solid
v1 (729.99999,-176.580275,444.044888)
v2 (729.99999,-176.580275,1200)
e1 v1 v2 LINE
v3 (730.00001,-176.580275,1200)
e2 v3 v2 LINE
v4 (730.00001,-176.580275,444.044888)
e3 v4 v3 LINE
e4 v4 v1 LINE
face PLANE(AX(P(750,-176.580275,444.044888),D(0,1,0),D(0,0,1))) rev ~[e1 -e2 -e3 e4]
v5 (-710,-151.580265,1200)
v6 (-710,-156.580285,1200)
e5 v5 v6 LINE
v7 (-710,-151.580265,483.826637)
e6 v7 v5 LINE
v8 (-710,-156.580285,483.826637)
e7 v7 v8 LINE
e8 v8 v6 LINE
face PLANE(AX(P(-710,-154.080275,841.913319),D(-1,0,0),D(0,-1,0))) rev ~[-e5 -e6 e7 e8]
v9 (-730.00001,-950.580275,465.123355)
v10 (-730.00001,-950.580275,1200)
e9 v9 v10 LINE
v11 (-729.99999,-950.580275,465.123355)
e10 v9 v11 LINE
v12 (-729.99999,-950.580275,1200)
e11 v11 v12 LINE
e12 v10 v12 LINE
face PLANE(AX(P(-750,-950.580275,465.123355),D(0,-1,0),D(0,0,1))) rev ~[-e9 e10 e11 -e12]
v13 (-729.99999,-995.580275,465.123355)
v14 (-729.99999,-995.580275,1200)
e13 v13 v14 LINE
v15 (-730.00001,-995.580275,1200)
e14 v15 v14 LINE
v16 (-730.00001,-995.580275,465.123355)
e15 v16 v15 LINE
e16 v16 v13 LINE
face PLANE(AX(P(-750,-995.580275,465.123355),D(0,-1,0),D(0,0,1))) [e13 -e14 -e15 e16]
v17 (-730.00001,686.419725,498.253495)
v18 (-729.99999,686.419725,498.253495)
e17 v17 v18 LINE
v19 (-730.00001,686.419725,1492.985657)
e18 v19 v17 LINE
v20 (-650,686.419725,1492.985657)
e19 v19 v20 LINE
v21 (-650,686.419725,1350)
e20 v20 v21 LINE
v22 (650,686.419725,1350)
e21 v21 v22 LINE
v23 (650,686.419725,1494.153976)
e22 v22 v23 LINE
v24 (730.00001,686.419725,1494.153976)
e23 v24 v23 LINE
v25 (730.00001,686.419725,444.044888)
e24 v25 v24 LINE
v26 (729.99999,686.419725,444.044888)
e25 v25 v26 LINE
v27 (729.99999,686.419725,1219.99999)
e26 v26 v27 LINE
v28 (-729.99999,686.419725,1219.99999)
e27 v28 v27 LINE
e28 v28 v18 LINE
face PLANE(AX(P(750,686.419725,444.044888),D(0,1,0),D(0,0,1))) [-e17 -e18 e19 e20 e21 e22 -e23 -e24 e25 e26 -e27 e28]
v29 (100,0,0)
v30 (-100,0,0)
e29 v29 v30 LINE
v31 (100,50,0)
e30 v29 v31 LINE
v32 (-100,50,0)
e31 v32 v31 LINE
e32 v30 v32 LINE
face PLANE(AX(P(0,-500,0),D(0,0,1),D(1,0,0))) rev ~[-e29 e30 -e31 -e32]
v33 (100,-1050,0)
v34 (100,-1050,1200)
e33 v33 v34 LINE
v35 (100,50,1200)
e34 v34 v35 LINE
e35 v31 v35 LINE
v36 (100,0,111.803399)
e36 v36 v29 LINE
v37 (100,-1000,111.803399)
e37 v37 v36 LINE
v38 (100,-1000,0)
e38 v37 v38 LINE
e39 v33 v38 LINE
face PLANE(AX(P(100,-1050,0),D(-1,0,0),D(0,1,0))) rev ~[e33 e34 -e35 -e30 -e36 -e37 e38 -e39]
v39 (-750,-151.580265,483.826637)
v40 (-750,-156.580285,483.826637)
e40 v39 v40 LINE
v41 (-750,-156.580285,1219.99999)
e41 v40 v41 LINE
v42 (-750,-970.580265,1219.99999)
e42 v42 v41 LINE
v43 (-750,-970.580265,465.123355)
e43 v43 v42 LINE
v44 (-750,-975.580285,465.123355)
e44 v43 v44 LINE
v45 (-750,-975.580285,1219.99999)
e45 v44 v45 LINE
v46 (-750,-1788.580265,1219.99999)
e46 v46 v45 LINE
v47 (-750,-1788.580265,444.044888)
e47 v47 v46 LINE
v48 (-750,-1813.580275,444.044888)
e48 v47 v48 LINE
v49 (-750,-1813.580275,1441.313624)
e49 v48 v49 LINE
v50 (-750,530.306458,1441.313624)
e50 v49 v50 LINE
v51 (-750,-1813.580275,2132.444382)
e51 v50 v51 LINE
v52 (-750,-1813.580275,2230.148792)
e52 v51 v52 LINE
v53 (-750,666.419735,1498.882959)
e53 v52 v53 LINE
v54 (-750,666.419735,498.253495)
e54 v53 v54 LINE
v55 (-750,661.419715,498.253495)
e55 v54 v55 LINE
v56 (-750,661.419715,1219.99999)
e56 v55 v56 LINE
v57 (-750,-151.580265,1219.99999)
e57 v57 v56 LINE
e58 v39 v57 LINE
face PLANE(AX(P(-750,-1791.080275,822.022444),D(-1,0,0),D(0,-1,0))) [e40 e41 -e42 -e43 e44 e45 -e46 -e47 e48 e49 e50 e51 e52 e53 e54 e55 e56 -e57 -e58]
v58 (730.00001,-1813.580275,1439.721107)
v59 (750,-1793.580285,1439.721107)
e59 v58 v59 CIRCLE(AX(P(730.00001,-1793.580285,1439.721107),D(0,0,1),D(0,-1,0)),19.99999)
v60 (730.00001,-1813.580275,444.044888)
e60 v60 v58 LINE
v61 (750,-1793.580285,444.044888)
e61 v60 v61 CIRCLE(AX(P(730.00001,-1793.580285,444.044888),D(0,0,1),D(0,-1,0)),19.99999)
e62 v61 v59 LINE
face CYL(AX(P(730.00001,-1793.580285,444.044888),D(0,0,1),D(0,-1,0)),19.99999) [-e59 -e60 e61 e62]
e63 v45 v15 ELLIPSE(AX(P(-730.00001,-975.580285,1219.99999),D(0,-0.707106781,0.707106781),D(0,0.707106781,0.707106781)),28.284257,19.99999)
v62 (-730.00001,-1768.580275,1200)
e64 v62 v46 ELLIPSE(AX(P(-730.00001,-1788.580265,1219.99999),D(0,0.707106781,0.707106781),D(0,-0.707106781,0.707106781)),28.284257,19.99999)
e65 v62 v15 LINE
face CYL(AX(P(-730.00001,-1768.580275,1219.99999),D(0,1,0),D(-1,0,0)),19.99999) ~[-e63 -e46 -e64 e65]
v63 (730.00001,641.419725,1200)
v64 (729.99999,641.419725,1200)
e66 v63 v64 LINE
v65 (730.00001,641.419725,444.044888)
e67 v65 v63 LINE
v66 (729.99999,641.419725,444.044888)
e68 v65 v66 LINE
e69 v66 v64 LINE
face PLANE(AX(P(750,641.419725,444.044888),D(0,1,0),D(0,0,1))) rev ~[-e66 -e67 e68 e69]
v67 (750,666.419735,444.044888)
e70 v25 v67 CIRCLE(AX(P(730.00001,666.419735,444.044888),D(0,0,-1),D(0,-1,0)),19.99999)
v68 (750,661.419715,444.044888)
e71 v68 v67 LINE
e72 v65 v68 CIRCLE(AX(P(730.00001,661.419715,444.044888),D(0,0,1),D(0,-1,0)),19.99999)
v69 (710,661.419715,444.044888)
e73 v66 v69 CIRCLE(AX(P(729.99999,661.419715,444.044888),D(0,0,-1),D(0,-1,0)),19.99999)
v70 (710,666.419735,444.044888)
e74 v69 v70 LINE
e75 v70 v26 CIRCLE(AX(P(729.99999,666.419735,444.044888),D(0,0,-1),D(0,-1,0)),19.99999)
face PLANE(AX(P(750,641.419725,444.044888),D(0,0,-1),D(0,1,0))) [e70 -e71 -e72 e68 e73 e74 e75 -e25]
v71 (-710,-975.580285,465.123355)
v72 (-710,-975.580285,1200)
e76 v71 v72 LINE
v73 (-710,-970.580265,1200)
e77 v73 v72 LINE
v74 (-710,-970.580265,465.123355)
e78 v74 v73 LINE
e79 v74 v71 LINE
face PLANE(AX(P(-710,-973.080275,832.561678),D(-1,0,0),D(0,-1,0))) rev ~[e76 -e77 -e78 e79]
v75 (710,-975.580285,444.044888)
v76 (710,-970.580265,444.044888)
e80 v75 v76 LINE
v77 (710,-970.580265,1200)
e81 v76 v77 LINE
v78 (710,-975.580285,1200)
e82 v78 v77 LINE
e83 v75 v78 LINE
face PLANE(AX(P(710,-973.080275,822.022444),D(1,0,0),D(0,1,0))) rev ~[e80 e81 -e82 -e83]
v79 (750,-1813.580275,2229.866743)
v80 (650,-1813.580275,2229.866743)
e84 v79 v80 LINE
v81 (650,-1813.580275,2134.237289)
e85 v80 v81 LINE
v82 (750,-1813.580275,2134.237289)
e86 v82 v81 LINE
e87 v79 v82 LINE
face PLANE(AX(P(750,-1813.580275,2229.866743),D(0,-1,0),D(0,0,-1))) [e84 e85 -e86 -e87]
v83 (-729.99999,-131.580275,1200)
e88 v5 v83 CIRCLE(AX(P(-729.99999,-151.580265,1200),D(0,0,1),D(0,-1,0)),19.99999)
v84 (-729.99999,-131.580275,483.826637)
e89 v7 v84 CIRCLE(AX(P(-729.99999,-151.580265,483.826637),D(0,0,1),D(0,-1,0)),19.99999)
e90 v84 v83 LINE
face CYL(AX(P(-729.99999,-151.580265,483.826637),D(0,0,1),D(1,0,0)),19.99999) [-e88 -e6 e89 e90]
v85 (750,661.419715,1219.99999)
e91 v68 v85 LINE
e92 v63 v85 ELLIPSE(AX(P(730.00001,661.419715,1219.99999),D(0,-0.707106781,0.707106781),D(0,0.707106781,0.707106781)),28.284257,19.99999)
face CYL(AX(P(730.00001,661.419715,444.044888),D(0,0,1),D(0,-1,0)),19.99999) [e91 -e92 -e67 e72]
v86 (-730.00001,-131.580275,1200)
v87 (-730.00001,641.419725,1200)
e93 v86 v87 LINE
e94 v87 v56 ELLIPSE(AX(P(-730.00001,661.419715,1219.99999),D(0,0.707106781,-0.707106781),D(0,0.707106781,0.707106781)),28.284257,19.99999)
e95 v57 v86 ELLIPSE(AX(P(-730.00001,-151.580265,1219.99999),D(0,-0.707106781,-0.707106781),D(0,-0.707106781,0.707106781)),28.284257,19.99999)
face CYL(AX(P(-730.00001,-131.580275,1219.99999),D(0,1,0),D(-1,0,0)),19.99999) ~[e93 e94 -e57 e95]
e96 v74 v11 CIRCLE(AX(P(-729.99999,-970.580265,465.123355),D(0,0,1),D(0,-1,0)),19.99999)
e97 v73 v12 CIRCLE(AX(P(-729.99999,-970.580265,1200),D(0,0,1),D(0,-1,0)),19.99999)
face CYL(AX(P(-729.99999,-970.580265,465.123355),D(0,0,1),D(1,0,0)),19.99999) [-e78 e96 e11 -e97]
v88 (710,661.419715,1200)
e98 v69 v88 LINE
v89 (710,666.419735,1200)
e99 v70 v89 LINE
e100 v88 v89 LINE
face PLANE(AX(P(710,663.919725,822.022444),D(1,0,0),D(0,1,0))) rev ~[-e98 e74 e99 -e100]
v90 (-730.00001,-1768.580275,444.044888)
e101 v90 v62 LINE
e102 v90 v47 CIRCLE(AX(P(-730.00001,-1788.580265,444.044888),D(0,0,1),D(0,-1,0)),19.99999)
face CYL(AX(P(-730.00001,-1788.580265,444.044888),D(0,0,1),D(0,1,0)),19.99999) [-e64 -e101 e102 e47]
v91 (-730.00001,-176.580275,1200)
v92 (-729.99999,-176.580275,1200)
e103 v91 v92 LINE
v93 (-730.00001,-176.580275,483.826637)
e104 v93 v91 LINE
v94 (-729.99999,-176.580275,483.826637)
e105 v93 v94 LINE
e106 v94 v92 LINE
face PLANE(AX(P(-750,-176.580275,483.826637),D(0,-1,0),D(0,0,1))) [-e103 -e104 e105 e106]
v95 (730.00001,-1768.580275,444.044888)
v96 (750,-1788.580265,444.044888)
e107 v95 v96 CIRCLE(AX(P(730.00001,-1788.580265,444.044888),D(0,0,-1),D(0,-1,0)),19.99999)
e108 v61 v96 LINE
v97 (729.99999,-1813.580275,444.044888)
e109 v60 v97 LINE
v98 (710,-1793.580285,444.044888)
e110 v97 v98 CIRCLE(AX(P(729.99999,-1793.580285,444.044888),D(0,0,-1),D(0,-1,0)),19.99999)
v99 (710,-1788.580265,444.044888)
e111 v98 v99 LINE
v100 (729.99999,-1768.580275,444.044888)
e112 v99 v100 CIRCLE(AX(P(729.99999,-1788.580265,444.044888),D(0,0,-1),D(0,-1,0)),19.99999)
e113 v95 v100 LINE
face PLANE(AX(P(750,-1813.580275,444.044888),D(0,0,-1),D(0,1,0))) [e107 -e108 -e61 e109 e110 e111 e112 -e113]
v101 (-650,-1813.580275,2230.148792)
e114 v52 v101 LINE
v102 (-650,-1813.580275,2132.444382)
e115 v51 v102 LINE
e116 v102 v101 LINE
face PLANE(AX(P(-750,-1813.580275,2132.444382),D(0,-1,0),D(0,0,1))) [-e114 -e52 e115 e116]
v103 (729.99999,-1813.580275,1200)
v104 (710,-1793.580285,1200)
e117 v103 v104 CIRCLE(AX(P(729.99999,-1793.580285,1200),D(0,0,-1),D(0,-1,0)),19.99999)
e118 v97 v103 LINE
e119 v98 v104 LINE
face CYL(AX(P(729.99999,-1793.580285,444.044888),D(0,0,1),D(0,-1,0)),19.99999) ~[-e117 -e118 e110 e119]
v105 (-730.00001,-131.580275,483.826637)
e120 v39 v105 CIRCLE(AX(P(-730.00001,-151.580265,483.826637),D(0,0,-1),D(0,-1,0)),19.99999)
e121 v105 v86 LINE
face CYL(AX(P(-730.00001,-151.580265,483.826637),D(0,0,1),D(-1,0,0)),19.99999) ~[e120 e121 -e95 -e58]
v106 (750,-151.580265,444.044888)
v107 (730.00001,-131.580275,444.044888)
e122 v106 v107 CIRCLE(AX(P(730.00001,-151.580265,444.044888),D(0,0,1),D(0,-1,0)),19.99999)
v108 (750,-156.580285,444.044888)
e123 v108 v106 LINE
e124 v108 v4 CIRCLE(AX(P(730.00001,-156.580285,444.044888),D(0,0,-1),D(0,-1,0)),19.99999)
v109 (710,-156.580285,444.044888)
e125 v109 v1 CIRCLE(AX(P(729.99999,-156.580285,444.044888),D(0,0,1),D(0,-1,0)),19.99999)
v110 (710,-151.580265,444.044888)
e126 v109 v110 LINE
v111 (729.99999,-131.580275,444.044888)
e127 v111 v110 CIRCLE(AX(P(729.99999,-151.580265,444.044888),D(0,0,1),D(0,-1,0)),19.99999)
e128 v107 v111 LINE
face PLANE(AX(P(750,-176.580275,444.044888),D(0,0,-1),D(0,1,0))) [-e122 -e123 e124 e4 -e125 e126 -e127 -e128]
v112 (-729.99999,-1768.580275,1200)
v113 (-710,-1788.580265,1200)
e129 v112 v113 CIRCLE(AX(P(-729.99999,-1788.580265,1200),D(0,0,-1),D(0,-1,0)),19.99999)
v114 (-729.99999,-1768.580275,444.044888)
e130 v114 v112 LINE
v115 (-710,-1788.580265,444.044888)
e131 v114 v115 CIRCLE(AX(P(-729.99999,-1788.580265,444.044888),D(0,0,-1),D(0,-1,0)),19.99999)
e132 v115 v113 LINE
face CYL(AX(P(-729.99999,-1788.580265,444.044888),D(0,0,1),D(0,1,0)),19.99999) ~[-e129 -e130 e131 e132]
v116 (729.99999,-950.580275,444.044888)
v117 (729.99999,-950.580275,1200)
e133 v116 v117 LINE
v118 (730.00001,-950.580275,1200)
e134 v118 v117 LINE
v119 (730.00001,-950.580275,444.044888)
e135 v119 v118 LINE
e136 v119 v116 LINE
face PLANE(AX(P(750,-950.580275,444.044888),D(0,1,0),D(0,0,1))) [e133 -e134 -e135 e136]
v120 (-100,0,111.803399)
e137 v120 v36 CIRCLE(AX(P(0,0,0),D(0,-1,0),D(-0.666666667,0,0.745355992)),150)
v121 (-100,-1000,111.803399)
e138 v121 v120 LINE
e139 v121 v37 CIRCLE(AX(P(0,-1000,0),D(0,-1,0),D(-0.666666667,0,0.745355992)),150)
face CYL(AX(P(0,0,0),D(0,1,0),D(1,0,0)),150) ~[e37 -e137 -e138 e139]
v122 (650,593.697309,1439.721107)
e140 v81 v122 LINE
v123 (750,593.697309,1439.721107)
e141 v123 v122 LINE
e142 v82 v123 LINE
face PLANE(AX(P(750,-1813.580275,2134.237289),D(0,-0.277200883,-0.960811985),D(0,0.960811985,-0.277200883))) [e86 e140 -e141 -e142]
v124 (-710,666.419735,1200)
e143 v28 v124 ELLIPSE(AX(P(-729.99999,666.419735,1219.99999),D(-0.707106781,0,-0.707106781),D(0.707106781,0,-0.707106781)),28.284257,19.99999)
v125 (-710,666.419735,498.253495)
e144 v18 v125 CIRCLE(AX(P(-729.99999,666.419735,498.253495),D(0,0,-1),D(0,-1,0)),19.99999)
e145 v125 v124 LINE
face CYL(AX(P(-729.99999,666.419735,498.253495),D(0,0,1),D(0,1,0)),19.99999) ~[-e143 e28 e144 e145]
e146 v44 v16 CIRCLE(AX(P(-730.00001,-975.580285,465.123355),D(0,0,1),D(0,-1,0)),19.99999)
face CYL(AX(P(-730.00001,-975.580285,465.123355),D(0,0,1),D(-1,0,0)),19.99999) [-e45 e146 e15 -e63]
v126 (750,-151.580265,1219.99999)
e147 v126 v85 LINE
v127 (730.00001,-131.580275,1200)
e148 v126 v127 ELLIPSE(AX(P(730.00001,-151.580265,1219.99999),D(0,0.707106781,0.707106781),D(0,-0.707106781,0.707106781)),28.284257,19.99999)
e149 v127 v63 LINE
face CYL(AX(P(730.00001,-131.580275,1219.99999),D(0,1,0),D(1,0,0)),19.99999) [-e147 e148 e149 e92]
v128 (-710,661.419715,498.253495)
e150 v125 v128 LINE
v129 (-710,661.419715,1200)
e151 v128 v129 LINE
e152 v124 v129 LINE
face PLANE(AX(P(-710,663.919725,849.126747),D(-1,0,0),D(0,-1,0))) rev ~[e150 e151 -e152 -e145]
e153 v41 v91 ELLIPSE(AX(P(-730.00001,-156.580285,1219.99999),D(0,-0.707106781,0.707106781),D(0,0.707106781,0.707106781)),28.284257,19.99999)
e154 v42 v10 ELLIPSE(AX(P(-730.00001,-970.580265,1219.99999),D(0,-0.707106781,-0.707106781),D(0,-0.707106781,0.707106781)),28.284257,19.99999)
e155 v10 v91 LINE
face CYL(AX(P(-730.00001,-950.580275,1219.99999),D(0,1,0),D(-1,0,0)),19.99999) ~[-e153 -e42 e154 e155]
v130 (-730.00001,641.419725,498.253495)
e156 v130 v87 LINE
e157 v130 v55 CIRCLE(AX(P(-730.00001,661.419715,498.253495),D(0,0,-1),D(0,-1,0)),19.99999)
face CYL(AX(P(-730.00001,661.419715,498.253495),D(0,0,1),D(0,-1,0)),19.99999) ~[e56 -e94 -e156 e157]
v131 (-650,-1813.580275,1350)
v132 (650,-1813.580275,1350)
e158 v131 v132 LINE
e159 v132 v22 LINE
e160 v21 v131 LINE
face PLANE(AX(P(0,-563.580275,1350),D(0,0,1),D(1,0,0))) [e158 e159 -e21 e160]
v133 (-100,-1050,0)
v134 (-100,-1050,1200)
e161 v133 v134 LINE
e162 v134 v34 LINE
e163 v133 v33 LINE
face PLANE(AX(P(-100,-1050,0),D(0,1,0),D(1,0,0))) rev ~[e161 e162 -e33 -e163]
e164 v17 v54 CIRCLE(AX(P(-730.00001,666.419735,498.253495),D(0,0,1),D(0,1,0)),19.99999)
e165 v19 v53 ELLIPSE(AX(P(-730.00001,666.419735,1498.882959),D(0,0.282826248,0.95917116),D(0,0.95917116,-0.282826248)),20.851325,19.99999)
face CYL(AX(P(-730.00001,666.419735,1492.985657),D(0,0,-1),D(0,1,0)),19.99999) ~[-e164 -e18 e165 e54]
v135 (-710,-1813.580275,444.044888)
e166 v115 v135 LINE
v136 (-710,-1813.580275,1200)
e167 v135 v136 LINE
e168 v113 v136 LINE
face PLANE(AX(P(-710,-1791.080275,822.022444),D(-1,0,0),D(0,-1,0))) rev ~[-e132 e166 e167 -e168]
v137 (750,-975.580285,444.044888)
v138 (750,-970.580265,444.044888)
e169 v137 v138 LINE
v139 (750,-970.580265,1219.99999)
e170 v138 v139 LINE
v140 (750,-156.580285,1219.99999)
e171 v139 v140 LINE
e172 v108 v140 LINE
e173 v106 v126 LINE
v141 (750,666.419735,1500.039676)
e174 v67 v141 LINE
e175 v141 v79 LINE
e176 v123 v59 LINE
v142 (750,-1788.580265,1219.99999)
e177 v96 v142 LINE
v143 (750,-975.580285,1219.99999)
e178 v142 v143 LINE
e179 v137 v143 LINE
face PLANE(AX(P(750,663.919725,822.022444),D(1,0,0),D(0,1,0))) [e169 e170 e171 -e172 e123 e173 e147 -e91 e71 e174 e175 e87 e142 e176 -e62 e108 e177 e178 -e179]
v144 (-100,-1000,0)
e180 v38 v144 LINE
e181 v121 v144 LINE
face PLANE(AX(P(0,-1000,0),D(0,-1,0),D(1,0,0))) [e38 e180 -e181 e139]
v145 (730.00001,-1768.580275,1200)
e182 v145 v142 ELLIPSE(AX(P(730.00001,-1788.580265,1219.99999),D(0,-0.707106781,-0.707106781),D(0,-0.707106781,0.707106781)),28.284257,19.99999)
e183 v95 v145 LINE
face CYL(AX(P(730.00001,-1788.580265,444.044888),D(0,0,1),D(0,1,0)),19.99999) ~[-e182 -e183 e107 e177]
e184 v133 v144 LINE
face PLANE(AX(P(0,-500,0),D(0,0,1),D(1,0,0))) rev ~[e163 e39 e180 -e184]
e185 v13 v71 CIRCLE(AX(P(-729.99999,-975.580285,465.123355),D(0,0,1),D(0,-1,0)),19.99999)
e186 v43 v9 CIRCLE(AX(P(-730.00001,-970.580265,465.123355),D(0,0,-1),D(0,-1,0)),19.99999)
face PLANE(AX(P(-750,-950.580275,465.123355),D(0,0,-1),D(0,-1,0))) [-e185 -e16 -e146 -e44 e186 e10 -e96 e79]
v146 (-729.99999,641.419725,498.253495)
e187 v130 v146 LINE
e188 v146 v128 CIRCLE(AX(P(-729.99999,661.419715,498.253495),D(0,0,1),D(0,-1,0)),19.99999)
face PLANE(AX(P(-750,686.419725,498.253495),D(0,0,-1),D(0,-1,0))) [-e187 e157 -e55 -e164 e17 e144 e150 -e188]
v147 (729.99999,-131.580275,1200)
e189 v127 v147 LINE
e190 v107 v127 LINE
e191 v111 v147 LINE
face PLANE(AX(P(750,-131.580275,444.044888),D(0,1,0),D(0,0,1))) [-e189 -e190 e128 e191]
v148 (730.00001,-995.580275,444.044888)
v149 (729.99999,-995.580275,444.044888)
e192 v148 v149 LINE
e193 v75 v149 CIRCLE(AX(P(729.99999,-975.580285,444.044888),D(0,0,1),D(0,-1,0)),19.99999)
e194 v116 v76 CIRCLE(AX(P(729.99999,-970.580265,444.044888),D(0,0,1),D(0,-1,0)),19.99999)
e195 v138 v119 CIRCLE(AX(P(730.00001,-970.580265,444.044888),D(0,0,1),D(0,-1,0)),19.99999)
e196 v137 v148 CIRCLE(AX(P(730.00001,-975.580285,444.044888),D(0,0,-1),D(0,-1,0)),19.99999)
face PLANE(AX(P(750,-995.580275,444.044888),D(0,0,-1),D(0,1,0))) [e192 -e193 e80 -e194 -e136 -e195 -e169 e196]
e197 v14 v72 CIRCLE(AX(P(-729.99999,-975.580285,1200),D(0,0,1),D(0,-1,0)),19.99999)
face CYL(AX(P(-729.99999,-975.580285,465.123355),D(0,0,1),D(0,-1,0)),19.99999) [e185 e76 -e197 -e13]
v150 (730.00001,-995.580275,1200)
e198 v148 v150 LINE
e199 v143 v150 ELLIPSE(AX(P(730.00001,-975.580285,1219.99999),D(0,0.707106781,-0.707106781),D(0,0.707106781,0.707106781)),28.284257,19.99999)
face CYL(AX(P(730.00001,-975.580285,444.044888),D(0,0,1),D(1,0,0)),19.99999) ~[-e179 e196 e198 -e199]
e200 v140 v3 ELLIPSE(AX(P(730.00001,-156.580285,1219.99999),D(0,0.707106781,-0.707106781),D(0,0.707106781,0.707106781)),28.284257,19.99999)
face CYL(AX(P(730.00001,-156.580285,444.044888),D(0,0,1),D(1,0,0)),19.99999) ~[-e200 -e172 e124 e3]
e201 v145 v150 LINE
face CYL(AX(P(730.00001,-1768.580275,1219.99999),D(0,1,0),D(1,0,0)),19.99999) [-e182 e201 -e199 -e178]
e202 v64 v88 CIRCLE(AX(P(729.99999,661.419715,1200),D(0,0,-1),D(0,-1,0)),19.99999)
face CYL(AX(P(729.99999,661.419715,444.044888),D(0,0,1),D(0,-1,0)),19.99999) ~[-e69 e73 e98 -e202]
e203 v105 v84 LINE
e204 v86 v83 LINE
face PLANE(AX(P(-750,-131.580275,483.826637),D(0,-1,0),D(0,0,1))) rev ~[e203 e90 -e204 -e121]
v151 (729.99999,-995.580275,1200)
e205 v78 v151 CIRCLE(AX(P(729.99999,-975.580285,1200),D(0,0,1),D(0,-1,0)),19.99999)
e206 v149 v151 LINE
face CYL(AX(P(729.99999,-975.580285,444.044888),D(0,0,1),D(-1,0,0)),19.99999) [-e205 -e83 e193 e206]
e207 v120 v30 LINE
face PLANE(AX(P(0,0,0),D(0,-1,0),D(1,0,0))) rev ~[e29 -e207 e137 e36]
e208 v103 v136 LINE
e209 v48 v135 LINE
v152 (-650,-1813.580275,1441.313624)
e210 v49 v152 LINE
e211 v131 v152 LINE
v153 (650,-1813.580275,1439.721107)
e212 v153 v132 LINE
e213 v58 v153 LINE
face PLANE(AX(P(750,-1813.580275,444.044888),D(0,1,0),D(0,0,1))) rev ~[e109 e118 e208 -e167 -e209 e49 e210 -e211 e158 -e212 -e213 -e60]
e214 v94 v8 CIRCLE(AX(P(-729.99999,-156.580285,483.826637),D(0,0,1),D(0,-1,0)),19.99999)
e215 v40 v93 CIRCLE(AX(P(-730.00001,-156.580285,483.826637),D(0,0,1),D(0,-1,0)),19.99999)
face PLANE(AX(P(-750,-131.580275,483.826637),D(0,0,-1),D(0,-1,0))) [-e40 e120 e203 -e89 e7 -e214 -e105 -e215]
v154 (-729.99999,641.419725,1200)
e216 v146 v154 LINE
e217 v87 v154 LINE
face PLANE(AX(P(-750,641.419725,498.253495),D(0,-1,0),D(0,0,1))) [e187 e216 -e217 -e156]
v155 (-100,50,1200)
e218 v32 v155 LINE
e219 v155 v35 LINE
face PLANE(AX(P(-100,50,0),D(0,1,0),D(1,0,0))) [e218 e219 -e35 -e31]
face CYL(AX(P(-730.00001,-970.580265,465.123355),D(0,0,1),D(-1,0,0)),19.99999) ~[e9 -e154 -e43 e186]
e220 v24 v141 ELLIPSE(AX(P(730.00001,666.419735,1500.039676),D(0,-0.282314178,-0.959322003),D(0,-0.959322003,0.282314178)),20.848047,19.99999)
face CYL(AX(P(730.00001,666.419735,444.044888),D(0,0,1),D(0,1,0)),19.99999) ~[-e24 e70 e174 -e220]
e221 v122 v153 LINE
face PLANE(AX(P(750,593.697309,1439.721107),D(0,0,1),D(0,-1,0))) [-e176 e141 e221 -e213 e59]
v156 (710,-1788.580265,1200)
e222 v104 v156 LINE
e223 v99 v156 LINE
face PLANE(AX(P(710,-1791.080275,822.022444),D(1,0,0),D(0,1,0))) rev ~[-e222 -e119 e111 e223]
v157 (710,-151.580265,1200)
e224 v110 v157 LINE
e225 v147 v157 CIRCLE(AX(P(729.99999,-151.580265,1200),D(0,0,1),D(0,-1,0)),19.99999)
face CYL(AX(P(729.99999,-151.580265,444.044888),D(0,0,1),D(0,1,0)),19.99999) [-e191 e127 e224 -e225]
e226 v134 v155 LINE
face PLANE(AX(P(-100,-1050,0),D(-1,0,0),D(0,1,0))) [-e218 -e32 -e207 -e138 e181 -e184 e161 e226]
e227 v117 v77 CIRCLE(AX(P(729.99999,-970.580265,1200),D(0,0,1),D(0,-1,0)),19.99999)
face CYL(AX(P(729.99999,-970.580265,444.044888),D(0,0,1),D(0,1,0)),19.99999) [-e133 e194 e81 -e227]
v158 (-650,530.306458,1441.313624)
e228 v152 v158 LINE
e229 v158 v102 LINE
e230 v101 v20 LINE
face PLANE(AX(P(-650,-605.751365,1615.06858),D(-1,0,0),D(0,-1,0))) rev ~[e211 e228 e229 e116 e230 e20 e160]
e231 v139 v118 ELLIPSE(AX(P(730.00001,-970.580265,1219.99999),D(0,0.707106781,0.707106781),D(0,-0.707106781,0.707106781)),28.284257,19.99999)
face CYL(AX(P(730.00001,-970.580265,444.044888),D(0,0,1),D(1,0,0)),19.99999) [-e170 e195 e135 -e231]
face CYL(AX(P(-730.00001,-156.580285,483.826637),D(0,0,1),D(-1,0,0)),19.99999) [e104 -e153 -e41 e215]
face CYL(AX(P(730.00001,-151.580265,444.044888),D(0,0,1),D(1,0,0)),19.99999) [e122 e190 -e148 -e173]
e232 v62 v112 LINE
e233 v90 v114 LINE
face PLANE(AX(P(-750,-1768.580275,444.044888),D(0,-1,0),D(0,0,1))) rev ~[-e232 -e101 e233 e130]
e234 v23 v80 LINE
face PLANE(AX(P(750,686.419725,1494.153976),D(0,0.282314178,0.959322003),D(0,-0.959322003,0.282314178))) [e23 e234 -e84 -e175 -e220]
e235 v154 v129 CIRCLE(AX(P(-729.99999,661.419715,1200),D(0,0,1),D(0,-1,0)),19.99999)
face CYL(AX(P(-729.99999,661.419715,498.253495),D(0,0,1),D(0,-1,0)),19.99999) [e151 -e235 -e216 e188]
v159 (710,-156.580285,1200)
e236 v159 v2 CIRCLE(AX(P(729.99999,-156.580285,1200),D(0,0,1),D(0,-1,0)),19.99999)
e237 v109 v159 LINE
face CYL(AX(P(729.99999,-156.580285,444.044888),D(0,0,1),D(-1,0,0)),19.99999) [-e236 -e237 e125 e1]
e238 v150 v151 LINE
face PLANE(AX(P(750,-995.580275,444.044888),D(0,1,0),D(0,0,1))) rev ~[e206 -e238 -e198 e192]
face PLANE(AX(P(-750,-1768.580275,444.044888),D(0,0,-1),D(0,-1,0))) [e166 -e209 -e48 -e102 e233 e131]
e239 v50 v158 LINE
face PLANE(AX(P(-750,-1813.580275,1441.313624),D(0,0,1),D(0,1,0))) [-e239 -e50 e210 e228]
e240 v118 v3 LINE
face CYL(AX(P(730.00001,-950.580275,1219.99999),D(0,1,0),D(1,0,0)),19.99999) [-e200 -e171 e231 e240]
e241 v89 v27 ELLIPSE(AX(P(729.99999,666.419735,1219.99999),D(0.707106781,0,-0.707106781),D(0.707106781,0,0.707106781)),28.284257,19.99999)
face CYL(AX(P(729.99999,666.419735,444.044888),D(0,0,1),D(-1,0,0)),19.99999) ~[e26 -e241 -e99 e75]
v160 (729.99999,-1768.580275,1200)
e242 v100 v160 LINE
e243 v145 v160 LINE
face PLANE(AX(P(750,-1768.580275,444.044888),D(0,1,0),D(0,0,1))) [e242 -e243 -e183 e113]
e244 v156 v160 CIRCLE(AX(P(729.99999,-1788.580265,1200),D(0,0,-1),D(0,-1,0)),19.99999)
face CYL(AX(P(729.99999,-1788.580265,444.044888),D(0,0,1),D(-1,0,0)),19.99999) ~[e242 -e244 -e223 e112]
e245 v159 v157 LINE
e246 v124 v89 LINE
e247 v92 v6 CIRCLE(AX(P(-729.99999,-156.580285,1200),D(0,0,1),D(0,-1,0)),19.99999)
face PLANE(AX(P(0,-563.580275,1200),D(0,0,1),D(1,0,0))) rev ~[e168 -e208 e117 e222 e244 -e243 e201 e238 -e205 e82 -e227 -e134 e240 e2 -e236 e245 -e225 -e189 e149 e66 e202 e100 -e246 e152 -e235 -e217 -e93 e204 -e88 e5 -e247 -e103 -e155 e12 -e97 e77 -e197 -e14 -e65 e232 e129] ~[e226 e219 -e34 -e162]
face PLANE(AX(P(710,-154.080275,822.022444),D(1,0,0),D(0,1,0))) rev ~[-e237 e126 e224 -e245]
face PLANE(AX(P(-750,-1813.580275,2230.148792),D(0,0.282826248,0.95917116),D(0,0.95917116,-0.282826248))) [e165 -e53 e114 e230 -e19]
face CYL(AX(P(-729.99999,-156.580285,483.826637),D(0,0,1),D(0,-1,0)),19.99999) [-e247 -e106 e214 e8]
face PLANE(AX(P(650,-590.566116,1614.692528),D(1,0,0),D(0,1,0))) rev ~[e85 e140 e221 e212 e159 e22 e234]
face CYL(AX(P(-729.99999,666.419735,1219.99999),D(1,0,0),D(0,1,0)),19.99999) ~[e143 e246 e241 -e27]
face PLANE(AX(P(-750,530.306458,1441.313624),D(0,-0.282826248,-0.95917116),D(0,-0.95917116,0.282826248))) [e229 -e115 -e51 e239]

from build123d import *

# Parameters (mm, degrees)
F0_R      = 150
F1_DEPTH  = 1000
F2_W      = 200
F2_H      = 1100
F3_DEPTH  = 1200
F4_W      = 1500
F4_H      = 2500
F4_W_2    = 200
F4_H_2    = 1100
F5_DEPTH  = 150
F7_DEPTH  = 100
F9_DEPTH  = 100
F11_W     = 45
F11_H     = 755.9551119804
F11_H_2   = 734.8766446114
F11_H_3   = 716.1733627319
F11_H_4   = 701.7465054989
F12_DEPTH = 40
F13_R     = 19.99999
F14_W     = 45
F14_H     = 755.9551119804
F15_DEPTH = 40
F17_R     = 19.99999


# Not quite as in the source:
# - a fillet or chamfer is up to 0.001 mm smaller than in the source, because OpenCascade refuses the exact size


with BuildPart() as f1:
    # F0 (on Front) → F1 (new body)
    with BuildSketch(Plane.XZ):
        Circle(F0_R)
    extrude(amount=F1_DEPTH)

    # F2 (on Top) → F3 (join)
    with BuildSketch(Plane.XY):
        with Locations((0, -500)):
            Rectangle(F2_W, F2_H)
    extrude(amount=F3_DEPTH)

    # F4 (on face) → F5 (join)
    with BuildSketch(Plane.XY.offset(1200)):
        with Locations((0, -563.5802745819)):
            Rectangle(F4_W, F4_H)
        with Locations((0, -500)):
            Rectangle(F4_W_2, F4_H_2, mode=Mode.SUBTRACT)
        with Locations((0, -500)):
            Rectangle(F4_W_2, F4_H_2)
    extrude(amount=F5_DEPTH)

    # F6 (on face) → F7 (join)
    with BuildSketch(Plane.YZ.offset(750)):
        Polygon((-1813.5802745819, 1350), (686.4197254181, 1350), (686.4197254181, 1494.1539764404), (-1813.5802745819, 2229.8667430878), (-1813.5802745819, 2134.2372894287), (593.697309494, 1439.7211074829), (-1813.5802745819, 1439.7211074829), align=None)
    extrude(amount=-F7_DEPTH)


with BuildPart() as f9:
    # F8 (on face) → F9 (new body)
    with BuildSketch(Plane(origin=(-750, 0, 0), x_dir=(0, -1, 0), z_dir=(-1, 0, 0))):
        Polygon((-686.4197254181, 1350), (1813.5802745819, 1350), (1813.5802745819, 1441.313624382), (-530.3064584732, 1441.313624382), (1813.5802745819, 2132.4443817139), (1813.5802745819, 2230.1487922668), (-686.4197254181, 1492.9856567951), align=None)
    extrude(amount=-F9_DEPTH)


with BuildPart() as f1_1:
    add(f1.part)

    # F10: union F9
    add(f9.part)

    # F11 (on face) → F12 (join)
    with BuildSketch(Plane(origin=(-750, 0, 0), x_dir=(0, -1, 0), z_dir=(-1, 0, 0))):
        with Locations((1791.0802745819, 822.0224440098)):
            Rectangle(F11_W, F11_H)
        with Locations((973.0802745819, 832.5616776943)):
            Rectangle(F11_W, F11_H_2)
        with Locations((154.0802745819, 841.913318634)):
            Rectangle(F11_W, F11_H_3)
        with Locations((-663.9197254181, 849.1267472506)):
            Rectangle(F11_W, F11_H_4)
    extrude(amount=-F12_DEPTH)

    # F13 (radius 20 in the source; OpenCascade refuses exactly that, so slightly less here)
    f13_edges = [f1_1.edges().sort_by_distance(p)[0] for p in [
        (-750, -1768.580275, 822.022444),
        (-710, -1768.580275, 822.022444),
        (-750, -950.580275, 832.561678),
        (-710, -950.580275, 832.561678),
        (-750, -995.580275, 832.561678),
        (-710, -995.580275, 832.561678),
        (-750, -131.580275, 841.913319),
        (-750, -176.580275, 841.913319),
        (-710, -131.580275, 841.913319),
        (-750, 686.419725, 995.619576),
        (-750, 641.419725, 849.126747),
        (-710, 686.419725, 849.126747),
        (-710, -176.580275, 841.913319),
        (-710, 641.419725, 849.126747),
        (-750, -1382.080275, 1200),
        (-750, -563.580275, 1200),
        (-750, 254.919725, 1200),
    ]]
    fillet(f13_edges, radius=F13_R)


with BuildPart() as f15:
    # F14 (on face) → F15 (new body)
    with BuildSketch(Plane.YZ.offset(750)):
        with Locations((-1791.0802745819, 822.0224440098)):
            Rectangle(F14_W, F14_H)
    extrude(amount=-F15_DEPTH)


with BuildPart() as f15b:
    # F14 (on face) → F15, piece 2 (new body)
    with BuildSketch(Plane.YZ.offset(750)):
        with Locations((-973.0802745819, 822.0224440098)):
            Rectangle(F14_W, F14_H)
    extrude(amount=-F15_DEPTH)


with BuildPart() as f15c:
    # F14 (on face) → F15, piece 3 (new body)
    with BuildSketch(Plane.YZ.offset(750)):
        with Locations((-154.0802745819, 822.0224440098)):
            Rectangle(F14_W, F14_H)
    extrude(amount=-F15_DEPTH)


with BuildPart() as f15d:
    # F14 (on face) → F15, piece 4 (new body)
    with BuildSketch(Plane.YZ.offset(750)):
        with Locations((663.9197254181, 822.0224440098)):
            Rectangle(F14_W, F14_H)
    extrude(amount=-F15_DEPTH)


with BuildPart() as f1_2:
    add(f1_1.part)

    # F16: union F15, F15b, F15c, F15d
    add(f15.part)
    add(f15b.part)
    add(f15c.part)
    add(f15d.part)

    # F17 (radius 20 in the source; OpenCascade refuses exactly that, so slightly less here)
    f17_edges = [f1_2.edges().sort_by_distance(p)[0] for p in [
        (750, 686.419725, 969.099432),
        (710, 686.419725, 822.022444),
        (750, 641.419725, 822.022444),
        (750, -131.580275, 822.022444),
        (710, -131.580275, 822.022444),
        (750, -176.580275, 822.022444),
        (750, -950.580275, 822.022444),
        (710, -950.580275, 822.022444),
        (750, -995.580275, 822.022444),
        (710, -1768.580275, 822.022444),
        (750, -1768.580275, 822.022444),
        (750, -1813.580275, 941.882998),
        (710, -995.580275, 822.022444),
        (710, -1813.580275, 822.022444),
        (710, -176.580275, 822.022444),
        (710, 641.419725, 822.022444),
        (750, 254.919725, 1200),
        (750, -563.580275, 1200),
        (750, -1382.080275, 1200),
        (-9.999995, 686.419725, 1200),
    ]]
    fillet(f17_edges, radius=F17_R)


solid = f1_2.part
